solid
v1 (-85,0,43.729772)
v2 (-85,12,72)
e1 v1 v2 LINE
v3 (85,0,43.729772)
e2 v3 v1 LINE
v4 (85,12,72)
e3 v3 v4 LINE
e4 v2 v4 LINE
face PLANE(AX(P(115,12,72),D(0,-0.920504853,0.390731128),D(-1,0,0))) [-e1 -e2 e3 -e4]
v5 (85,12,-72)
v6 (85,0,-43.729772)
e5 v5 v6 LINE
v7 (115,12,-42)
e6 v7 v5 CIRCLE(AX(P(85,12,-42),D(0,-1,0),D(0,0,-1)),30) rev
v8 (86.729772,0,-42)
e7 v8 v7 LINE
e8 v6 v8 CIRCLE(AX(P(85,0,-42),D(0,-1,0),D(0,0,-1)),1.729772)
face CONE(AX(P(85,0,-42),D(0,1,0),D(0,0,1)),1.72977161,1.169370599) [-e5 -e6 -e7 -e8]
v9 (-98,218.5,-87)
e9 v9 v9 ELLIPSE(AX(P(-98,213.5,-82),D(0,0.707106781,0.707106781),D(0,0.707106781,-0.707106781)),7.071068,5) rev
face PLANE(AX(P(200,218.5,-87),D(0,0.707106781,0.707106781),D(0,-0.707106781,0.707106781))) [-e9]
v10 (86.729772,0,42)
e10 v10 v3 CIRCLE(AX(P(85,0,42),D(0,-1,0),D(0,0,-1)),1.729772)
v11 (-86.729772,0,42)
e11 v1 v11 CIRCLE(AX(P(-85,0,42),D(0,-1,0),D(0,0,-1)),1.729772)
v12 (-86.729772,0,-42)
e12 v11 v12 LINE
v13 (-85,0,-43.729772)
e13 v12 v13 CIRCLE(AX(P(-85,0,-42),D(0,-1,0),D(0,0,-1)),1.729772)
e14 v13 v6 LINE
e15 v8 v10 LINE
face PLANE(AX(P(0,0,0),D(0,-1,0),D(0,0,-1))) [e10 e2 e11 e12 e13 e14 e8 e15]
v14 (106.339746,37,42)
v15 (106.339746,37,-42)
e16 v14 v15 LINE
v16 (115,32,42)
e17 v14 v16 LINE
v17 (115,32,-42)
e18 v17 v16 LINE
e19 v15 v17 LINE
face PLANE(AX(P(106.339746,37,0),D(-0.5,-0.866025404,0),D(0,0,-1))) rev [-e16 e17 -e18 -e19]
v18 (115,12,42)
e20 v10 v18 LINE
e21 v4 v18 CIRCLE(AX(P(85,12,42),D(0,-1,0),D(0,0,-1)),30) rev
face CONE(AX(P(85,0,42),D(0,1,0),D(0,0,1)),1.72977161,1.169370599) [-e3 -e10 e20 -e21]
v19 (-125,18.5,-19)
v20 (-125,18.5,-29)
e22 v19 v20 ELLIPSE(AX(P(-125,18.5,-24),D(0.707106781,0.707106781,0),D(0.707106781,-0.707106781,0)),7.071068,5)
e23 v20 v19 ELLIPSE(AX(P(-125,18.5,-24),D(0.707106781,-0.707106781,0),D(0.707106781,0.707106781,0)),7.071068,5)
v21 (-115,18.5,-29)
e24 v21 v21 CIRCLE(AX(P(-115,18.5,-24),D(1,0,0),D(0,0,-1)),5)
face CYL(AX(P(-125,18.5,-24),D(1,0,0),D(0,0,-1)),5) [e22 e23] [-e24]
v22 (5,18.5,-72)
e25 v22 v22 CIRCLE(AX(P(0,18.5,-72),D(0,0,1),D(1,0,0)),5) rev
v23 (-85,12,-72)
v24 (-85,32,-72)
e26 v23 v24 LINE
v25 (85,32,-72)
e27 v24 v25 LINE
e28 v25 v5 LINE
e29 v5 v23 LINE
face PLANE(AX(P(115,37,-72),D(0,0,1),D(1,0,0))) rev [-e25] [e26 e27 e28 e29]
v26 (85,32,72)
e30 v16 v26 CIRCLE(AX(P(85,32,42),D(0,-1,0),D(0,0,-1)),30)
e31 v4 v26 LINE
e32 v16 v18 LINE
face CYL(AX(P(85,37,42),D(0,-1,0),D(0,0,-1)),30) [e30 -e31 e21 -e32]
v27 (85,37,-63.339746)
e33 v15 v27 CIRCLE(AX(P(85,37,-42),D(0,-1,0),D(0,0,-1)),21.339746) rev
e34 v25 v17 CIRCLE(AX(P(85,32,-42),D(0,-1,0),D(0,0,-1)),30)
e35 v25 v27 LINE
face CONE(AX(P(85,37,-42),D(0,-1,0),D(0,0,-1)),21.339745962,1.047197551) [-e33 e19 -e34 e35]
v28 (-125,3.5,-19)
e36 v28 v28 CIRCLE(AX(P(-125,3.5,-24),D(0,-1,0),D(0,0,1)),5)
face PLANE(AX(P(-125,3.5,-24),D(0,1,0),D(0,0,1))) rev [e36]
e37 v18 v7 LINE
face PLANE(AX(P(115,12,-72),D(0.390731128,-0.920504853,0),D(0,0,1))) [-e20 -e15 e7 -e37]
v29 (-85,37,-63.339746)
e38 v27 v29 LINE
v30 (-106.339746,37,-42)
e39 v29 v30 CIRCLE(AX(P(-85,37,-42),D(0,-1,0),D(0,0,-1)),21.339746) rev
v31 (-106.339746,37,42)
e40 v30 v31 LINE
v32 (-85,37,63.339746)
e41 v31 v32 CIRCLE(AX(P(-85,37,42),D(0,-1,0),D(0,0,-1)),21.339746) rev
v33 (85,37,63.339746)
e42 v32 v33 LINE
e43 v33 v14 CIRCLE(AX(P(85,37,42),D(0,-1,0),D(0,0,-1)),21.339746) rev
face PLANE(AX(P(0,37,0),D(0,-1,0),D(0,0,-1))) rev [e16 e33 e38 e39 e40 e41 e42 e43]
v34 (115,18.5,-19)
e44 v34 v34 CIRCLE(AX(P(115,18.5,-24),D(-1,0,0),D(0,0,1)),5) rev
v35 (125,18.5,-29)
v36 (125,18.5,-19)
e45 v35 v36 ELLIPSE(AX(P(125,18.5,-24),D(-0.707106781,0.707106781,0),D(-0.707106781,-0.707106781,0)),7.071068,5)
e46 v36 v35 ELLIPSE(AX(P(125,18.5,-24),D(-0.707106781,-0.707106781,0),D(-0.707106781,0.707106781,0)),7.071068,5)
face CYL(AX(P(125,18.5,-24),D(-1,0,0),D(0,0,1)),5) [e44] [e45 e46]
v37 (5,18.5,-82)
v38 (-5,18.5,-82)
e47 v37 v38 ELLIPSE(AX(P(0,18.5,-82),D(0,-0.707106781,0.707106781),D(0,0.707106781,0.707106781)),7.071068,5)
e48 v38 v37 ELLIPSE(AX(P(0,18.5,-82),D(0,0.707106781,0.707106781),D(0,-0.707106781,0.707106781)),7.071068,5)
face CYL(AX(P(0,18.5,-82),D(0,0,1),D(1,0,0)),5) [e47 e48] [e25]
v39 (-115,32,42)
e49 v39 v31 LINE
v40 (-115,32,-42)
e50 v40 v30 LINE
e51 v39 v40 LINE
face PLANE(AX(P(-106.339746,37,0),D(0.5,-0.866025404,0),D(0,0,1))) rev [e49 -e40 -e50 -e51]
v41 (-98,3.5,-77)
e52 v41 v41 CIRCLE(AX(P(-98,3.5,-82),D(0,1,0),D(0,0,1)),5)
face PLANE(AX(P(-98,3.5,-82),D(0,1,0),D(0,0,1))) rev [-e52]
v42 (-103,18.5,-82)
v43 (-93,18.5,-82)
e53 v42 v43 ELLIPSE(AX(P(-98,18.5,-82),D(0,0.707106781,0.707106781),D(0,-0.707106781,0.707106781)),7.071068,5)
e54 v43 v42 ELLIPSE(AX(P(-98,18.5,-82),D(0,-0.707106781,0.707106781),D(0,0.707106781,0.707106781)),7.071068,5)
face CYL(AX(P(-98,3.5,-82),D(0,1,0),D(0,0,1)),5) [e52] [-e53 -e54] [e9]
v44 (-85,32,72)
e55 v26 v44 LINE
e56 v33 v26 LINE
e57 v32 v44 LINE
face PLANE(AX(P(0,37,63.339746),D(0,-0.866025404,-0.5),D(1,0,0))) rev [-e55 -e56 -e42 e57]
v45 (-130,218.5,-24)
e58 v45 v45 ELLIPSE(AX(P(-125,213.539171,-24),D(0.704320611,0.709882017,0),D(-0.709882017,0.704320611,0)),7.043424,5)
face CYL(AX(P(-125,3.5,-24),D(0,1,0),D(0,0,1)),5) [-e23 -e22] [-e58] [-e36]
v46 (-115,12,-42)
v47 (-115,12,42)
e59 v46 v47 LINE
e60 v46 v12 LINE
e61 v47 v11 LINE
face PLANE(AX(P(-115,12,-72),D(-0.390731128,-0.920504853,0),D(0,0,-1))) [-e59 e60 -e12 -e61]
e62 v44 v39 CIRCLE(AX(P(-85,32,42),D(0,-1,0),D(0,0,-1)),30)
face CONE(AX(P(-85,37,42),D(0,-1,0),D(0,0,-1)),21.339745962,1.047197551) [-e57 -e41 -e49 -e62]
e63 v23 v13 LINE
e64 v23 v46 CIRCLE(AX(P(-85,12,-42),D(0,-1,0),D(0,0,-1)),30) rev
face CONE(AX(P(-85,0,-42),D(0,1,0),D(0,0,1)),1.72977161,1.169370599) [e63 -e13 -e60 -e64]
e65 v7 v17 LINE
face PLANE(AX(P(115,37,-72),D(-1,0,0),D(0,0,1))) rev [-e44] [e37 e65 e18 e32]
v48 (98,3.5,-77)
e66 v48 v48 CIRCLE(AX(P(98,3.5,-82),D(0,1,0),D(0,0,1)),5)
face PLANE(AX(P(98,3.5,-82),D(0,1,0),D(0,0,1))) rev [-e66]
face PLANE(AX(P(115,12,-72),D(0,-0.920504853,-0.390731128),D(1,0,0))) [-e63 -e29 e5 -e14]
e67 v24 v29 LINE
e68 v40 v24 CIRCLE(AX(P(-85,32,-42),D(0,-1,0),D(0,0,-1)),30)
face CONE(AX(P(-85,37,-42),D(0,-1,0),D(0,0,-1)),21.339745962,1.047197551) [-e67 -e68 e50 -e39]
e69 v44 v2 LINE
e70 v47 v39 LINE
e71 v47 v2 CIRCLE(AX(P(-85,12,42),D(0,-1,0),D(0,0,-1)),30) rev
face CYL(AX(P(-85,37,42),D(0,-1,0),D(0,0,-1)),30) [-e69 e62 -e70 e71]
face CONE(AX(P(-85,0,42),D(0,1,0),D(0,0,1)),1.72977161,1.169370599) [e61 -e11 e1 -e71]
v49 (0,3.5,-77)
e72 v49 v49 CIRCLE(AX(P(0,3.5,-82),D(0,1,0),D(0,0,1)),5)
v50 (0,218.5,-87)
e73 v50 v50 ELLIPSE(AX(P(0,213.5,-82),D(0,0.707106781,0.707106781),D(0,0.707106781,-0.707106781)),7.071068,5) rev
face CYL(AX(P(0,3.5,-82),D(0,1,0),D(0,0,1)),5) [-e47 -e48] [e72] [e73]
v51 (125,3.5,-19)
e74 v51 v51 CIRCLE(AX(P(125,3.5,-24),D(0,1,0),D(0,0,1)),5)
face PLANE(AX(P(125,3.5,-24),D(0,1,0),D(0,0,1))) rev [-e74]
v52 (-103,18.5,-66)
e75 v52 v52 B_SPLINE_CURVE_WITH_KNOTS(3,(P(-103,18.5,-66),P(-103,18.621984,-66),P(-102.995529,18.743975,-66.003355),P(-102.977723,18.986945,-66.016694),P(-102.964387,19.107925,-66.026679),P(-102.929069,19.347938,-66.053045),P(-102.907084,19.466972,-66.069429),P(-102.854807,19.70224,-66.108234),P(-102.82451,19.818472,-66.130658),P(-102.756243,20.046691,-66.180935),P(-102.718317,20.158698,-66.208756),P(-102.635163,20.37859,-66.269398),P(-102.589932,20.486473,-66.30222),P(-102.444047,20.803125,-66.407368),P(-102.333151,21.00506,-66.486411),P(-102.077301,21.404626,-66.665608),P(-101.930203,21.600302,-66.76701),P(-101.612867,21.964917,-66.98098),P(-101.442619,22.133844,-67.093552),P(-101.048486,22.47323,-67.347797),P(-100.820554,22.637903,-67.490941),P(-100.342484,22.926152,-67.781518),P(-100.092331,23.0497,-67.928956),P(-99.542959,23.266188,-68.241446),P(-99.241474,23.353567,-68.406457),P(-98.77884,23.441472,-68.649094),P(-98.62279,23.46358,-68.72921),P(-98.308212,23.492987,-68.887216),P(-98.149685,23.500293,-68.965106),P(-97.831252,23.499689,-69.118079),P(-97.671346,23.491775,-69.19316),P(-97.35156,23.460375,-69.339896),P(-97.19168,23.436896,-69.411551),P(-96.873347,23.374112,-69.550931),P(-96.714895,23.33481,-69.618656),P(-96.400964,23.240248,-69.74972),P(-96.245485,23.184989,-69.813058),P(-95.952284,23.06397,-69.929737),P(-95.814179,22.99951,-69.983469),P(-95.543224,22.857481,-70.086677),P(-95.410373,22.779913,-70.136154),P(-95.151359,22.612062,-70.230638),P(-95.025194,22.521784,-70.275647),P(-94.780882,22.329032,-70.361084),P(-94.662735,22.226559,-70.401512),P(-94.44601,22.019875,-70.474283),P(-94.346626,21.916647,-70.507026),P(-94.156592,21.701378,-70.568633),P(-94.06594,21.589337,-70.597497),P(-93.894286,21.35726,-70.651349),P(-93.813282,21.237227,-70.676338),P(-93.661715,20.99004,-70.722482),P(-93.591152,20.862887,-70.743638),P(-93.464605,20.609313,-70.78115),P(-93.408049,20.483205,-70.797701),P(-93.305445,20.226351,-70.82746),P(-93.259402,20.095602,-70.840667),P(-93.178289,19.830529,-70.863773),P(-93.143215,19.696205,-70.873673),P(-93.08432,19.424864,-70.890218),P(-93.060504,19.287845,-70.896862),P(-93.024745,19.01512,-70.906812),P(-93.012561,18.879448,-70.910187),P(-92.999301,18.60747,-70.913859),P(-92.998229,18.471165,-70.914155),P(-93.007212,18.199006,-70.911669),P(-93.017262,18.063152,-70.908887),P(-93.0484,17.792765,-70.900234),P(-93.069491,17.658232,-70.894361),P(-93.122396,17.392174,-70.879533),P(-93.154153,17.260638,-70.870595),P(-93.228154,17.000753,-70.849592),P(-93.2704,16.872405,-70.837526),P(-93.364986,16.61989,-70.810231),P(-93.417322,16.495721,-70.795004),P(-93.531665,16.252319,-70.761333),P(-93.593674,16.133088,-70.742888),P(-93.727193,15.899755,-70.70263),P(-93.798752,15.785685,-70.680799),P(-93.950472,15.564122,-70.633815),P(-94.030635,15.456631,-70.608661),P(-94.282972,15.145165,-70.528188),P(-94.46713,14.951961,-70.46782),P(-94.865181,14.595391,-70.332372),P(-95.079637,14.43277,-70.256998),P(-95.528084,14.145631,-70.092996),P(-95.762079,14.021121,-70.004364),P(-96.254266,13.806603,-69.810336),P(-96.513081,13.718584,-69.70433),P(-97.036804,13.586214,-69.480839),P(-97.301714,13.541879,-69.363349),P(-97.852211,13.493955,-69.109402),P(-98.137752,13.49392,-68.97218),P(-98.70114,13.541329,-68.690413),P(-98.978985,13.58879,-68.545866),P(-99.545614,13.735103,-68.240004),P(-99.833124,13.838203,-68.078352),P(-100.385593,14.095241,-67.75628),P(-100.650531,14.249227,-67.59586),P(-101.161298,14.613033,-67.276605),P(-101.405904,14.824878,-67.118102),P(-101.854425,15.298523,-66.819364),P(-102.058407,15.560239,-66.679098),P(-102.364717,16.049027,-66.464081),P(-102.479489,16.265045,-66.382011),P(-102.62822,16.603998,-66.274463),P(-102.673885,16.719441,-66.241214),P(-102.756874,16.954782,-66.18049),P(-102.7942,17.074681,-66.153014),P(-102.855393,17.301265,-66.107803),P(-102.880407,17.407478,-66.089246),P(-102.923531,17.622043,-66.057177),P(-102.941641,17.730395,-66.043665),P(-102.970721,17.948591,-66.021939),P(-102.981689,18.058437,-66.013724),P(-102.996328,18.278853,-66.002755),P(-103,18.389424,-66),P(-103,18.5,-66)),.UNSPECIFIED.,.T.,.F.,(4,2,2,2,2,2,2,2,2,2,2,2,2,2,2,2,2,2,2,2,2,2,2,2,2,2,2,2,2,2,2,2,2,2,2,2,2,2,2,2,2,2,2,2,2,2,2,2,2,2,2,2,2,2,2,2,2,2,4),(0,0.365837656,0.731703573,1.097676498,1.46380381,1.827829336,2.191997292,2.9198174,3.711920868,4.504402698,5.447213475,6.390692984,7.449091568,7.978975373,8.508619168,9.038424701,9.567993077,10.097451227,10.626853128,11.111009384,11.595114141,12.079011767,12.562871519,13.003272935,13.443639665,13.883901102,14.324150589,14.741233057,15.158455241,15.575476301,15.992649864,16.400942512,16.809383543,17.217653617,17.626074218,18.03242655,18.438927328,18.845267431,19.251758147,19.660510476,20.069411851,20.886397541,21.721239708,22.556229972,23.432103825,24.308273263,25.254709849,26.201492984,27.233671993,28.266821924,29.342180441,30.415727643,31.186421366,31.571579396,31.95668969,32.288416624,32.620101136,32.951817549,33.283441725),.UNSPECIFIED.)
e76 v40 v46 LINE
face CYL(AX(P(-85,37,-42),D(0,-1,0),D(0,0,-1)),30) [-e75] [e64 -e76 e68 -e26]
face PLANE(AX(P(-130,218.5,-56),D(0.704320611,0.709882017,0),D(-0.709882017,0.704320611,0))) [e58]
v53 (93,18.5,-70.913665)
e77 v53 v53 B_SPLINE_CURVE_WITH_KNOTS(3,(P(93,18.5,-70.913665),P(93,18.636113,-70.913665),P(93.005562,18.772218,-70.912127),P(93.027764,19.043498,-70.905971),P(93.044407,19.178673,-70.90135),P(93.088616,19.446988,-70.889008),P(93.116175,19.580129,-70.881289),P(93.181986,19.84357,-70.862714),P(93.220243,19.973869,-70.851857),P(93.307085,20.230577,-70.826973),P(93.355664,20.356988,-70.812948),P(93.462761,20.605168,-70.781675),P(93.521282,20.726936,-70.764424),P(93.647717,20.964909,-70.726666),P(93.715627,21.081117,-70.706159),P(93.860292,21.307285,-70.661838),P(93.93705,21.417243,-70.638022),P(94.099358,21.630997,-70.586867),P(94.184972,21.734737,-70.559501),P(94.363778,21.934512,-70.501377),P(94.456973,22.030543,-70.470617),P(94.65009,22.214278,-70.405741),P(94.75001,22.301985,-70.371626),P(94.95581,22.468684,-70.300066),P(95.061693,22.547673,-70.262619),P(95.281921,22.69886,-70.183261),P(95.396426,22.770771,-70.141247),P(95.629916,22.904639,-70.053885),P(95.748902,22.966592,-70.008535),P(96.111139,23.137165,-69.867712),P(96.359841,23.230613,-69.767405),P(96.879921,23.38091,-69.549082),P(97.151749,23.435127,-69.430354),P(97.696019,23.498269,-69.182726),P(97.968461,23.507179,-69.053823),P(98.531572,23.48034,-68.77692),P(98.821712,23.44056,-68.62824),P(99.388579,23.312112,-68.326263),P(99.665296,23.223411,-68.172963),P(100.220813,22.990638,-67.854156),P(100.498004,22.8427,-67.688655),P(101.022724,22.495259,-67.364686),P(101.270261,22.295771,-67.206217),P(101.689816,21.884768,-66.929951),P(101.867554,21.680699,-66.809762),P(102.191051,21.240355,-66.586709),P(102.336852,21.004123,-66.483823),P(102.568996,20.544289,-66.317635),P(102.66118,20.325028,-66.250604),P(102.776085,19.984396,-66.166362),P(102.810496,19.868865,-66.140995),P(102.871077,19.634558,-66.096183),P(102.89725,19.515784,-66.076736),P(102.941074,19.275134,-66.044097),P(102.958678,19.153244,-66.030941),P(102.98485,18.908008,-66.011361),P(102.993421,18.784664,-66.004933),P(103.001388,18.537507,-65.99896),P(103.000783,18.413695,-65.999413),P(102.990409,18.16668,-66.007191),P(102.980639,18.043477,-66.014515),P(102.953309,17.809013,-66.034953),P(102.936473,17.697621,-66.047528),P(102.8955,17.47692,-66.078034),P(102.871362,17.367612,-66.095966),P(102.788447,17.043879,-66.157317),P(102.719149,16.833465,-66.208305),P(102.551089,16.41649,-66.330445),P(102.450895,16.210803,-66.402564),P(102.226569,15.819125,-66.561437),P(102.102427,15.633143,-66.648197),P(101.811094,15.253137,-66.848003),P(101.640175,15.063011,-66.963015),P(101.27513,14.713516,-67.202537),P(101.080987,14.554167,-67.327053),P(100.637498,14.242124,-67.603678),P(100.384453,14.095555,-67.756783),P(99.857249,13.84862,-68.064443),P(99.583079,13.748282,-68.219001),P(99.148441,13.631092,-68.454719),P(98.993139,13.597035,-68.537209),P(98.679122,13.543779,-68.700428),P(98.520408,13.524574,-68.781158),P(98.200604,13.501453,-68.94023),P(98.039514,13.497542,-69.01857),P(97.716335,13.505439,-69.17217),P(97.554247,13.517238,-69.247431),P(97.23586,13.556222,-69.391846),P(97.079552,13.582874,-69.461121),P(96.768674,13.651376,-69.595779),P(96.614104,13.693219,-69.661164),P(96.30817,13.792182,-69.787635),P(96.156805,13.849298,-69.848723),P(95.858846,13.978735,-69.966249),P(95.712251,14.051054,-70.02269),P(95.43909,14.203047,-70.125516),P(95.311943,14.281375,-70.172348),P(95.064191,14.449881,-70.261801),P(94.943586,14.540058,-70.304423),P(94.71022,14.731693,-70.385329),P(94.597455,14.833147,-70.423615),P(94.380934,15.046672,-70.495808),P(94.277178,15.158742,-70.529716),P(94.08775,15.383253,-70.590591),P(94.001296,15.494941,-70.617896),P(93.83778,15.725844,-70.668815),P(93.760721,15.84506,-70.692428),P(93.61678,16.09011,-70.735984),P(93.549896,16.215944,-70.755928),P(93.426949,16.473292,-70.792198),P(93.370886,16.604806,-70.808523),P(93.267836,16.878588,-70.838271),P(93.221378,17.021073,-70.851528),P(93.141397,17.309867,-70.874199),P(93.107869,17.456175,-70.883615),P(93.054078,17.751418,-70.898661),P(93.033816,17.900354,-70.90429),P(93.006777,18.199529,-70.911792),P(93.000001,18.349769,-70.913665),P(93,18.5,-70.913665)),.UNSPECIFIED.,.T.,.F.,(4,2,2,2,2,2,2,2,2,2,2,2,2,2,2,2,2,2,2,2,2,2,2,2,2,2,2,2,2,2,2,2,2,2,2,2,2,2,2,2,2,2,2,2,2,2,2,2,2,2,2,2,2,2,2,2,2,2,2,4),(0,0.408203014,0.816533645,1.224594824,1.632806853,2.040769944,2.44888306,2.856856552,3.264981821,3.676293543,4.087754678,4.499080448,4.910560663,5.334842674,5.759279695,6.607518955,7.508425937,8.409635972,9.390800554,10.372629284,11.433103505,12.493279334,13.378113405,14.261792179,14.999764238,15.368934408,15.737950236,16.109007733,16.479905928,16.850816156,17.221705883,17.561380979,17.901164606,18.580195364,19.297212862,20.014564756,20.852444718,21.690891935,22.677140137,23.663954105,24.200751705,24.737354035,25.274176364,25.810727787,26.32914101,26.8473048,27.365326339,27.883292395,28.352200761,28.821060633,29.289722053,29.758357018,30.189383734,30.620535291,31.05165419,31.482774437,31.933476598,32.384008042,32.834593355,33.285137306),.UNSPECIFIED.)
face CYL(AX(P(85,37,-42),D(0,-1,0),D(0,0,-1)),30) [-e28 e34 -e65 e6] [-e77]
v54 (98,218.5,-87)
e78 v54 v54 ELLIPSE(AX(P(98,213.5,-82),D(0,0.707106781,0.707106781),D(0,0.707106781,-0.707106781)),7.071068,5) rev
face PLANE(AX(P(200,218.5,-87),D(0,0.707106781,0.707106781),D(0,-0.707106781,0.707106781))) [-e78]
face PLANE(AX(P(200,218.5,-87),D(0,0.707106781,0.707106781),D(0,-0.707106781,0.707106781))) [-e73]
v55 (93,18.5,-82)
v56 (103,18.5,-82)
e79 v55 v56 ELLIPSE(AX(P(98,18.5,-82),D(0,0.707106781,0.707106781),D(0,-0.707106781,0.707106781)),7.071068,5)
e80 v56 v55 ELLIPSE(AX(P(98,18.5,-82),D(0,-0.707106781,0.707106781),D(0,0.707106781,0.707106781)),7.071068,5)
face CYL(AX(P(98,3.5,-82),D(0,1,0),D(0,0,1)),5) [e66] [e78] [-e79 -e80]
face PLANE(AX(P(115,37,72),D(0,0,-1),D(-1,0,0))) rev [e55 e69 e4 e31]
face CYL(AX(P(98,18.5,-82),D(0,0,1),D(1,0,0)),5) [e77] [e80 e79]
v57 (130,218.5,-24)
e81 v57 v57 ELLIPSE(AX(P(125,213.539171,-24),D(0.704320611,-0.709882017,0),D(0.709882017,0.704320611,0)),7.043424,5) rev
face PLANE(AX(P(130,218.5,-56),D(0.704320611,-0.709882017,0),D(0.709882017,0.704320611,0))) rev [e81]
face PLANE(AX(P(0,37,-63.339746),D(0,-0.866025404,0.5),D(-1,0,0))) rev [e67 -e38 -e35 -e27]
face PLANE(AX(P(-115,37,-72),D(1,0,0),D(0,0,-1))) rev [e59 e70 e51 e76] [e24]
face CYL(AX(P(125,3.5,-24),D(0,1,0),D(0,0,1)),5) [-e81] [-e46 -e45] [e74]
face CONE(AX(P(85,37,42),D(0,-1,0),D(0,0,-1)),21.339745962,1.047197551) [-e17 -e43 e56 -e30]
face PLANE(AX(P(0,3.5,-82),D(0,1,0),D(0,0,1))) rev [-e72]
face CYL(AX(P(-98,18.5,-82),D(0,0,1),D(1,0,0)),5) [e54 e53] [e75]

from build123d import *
from OCP.BRepFilletAPI import BRepFilletAPI_MakeChamfer

# Parameters (mm, degrees)
ESBO_O1_W                     = 230
ESBO_O1_H                     = 144
RESSALTO_EXTRUS_O1_DEPTH      = 37
ESBO_O2_R                     = 5
RESSALTO_EXTRUS_O2_DEPTH      = 10
RESSALTO_EXTRUS_O3_START      = -15
ESBO_O3_R                     = 5
RESSALTO_EXTRUS_O3_DEPTH      = 215
CORTE_EXTRUS_O1_DEPTH         = 56
ESBO_O6_R                     = 5
RESSALTO_EXTRUS_O4_DEPTH      = 10
RESSALTO_EXTRUS_O5_DEPTH      = 200
RESSALTO_EXTRUS_O5_DEPTH_BACK = 15
ESBO_O7_R                     = 5
CORTE_EXTRUS_O2_DEPTH         = 200
CORTE_EXTRUS_O2_DEPTH_BACK    = 200
FILETE1_START                 = -1
FILETE1_DEPTH                 = 39
FILETE1_START_2               = 23.5000001
FILETE1_2_DEPTH               = 14.4999999
FILETE1_3_DEPTH               = 14.499999761
FILETE1_START_3               = 23.281176651
FILETE1_4_DEPTH               = 9.810883349
FILETE1_START_4               = 13.499999761
FILETE1_5_DEPTH               = 9.78117689
FILETE1_6_DEPTH               = 0.218823449
FILETE1_START_5               = -72
FILETE1_7_OUTLINE_R           = 5
FILETE1_7_DEPTH               = 30
CHANFRO1_SIZE                 = 5
CHANFRO1_SIZE2                = 8.660254038
CHANFRO2_SIZE                 = 12
CHANFRO2_SIZE2                = 28.27022839


with BuildPart() as part:
    # Esboço1 → Ressalto-extrusão1 (new body)
    with BuildSketch(Plane(origin=(0, 0, 0), x_dir=(1, 0, 0), z_dir=(0, 1, 0))):
        Rectangle(ESBO_O1_W, ESBO_O1_H)
    extrude(amount=RESSALTO_EXTRUS_O1_DEPTH)

    # Esboço2 → Ressalto-extrusão2 (add)
    with BuildSketch(Plane(origin=(115, 0, 0), x_dir=(0, 0, -1), z_dir=(1, 0, 0))):
        with Locations(Location((24, 18.5, 0), (0, 0, 180))):
            Circle(ESBO_O2_R)
    ressalto_extrus_o2 = extrude(amount=RESSALTO_EXTRUS_O2_DEPTH)

    # Esboço3 → Ressalto-extrusão3 (add)
    with BuildSketch(Plane(origin=(0, 18.5, 0), x_dir=(1, 0, 0), z_dir=(0, 1, 0)).offset(RESSALTO_EXTRUS_O3_START)):
        with Locations(Location((125, 24, 0), (0, 0, 270))):
            Circle(ESBO_O3_R)
    ressalto_extrus_o3 = extrude(amount=RESSALTO_EXTRUS_O3_DEPTH)

    # Esboço4 → Corte-extrusão1 (cut)
    with BuildSketch(Plane.XY):
        Polygon((130, 218.5), (120, 208.57834268), (120, 218.5), align=None)
    corte_extrus_o1 = extrude(amount=-CORTE_EXTRUS_O1_DEPTH, mode=Mode.SUBTRACT)

    # Espelhar1: Ressalto-extrusão2, Ressalto-extrusão3, Corte-extrusão1 across plane
    add(ressalto_extrus_o2.mirror(Plane(origin=(0, 0, 0), x_dir=(0, 0, 1), z_dir=(1, 0, 0))))
    add(ressalto_extrus_o3.mirror(Plane(origin=(0, 0, 0), x_dir=(0, 0, 1), z_dir=(1, 0, 0))))
    add(corte_extrus_o1.mirror(Plane(origin=(0, 0, 0), x_dir=(0, 0, 1), z_dir=(1, 0, 0))), mode=Mode.SUBTRACT)

    # Esboço6 → Ressalto-extrusão4 (add)
    with BuildSketch(Plane(origin=(0, 0, -72), x_dir=(-1, 0, 0), z_dir=(0, 0, -1))):
        with Locations(Location((-98, 18.5, 0), (0, 0, 180))):
            Circle(ESBO_O6_R)
        with Locations(Location((0, 18.5, 0), (0, 0, 180))):
            Circle(ESBO_O6_R)
        with Locations(Location((98, 18.5, 0), (0, 0, 180))):
            Circle(ESBO_O6_R)
    extrude(amount=RESSALTO_EXTRUS_O4_DEPTH)

    # Esboço7 → Ressalto-extrusão5 (add, two sides: drawn at the far end of the back side and taken through both)
    with BuildSketch(Plane(origin=(0, 18.5, 0), x_dir=(1, 0, 0), z_dir=(0, 1, 0)).offset(-RESSALTO_EXTRUS_O5_DEPTH_BACK)):
        with Locations(Location((-98, 82, 0), (0, 0, 270))):
            Circle(ESBO_O7_R)
        with Locations(Location((0, 82, 0), (0, 0, 270))):
            Circle(ESBO_O7_R)
        with Locations(Location((98, 82, 0), (0, 0, 270))):
            Circle(ESBO_O7_R)
    extrude(amount=RESSALTO_EXTRUS_O5_DEPTH + RESSALTO_EXTRUS_O5_DEPTH_BACK)

    # Esboço8 → Corte-extrusão2 (cut, two sides: drawn at the far end of the back side and taken through both)
    with BuildSketch(Plane(origin=(0, 0, 0), x_dir=(0, 0, -1), z_dir=(1, 0, 0)).offset(-CORTE_EXTRUS_O2_DEPTH_BACK)):
        Polygon((87, 218.5), (77, 208.5), (77, 218.5), align=None)
    extrude(amount=CORTE_EXTRUS_O2_DEPTH + CORTE_EXTRUS_O2_DEPTH_BACK, mode=Mode.SUBTRACT)

    # Filete1: read off the stored shape, not the designer's step
    # Filete1 outline → Filete1 (cut)
    with BuildSketch(Plane(origin=(0, 0, 0), x_dir=(1, 0, 0), z_dir=(0, 1, 0)).offset(FILETE1_START)):
        with BuildLine():
            ThreePointArc((-85, -72), (-106.213203436, -63.213203436), (-115, -42))
            Line((-115, -42), (-115, -72))
            Line((-115, -72), (-85, -72))
        make_face()
        with BuildLine():
            ThreePointArc((115, -42), (106.213203436, -63.213203436), (85, -72))
            Line((85, -72), (115, -72))
            Line((115, -72), (115, -42))
        make_face()
    extrude(amount=FILETE1_DEPTH, mode=Mode.SUBTRACT)

    # Filete1 2 outline → Filete1 2 (cut)
    with BuildSketch(Plane(origin=(0, 0, 0), x_dir=(1, 0, 0), z_dir=(0, 1, 0)).offset(FILETE1_START_2)):
        with BuildLine():
            Line((-115, 72), (-115, 42))
            ThreePointArc((-115, 42), (-106.213203436, 63.213203436), (-85, 72))
            Line((-85, 72), (-115, 72))
        make_face()
        with BuildLine():
            Line((115, 72), (85, 72))
            ThreePointArc((85, 72), (106.213203436, 63.213203436), (115, 42))
            Line((115, 42), (115, 72))
        make_face()
    extrude(amount=FILETE1_2_DEPTH, mode=Mode.SUBTRACT)

    # Filete1 3 outline → Filete1 3 (cut)
    with BuildSketch(Plane(origin=(0, 0, 0), x_dir=(1, 0, 0), z_dir=(0, 1, 0)).offset(FILETE1_START)):
        with BuildLine():
            Line((-115, 72), (-115, 42))
            ThreePointArc((-115, 42), (-106.213203436, 63.213203436), (-85, 72))
            Line((-85, 72), (-115, 72))
        make_face()
        with BuildLine():
            Line((115, 72), (85, 72))
            ThreePointArc((85, 72), (106.213203436, 63.213203436), (115, 42))
            Line((115, 42), (115, 72))
        make_face()
    extrude(amount=FILETE1_3_DEPTH, mode=Mode.SUBTRACT)

    # Filete1 4 outline → Filete1 4 (cut)
    with BuildSketch(Plane(origin=(0, 0, 0), x_dir=(1, 0, 0), z_dir=(0, 1, 0)).offset(FILETE1_START_3)):
        with BuildLine():
            Line((115, 72), (85, 72))
            ThreePointArc((85, 72), (106.213203436, 63.213203436), (115, 42))
            Line((115, 42), (115, 72))
        make_face()
    extrude(amount=FILETE1_4_DEPTH, mode=Mode.SUBTRACT)

    # Filete1 5 outline → Filete1 5 (cut)
    with BuildSketch(Plane(origin=(0, 0, 0), x_dir=(1, 0, 0), z_dir=(0, 1, 0)).offset(FILETE1_START_4)):
        with BuildLine():
            Line((-115, 72), (-115, 42))
            ThreePointArc((-115, 42), (-106.213203436, 63.213203436), (-85, 72))
            Line((-85, 72), (-115, 72))
        make_face()
        with BuildLine():
            Line((115, 72), (85, 72))
            ThreePointArc((85, 72), (106.213203436, 63.213203436), (115, 42))
            Line((115, 42), (115, 72))
        make_face()
    extrude(amount=FILETE1_5_DEPTH, mode=Mode.SUBTRACT)

    # Filete1 6 outline → Filete1 6 (cut)
    with BuildSketch(Plane(origin=(0, 0, 0), x_dir=(1, 0, 0), z_dir=(0, 1, 0)).offset(FILETE1_START_3)):
        with BuildLine():
            Line((-115, 72), (-115, 42))
            ThreePointArc((-115, 42), (-106.213203436, 63.213203436), (-85, 72))
            Line((-85, 72), (-115, 72))
        make_face()
    extrude(amount=FILETE1_6_DEPTH, mode=Mode.SUBTRACT)

    # Filete1 7 outline → Filete1 7 (add)
    with BuildSketch(Plane.XY.offset(FILETE1_START_5)):
        with Locations((98, 18.5)):
            Circle(FILETE1_7_OUTLINE_R)
        with Locations((-98, 18.5)):
            Circle(FILETE1_7_OUTLINE_R)
    extrude(amount=FILETE1_7_DEPTH)

    # Chanfro1: one chamfer whose edges measure the first distance from different faces: ONE call of the kernel's chamfer builder (chamfer() names one face for all edges)
    chanfro1_edges_1 = [part.edges().sort_by_distance(p)[0] for p in [
        (-115, 37, 0),
    ]]
    chanfro1_side_1 = [part.faces().sort_by_distance(p)[0] for p in [
        (-115, 18.5, 0.622208406),
    ]]
    chanfro1_edges_2 = [part.edges().sort_by_distance(p)[0] for p in [
        (0, 37, -72),
    ]]
    chanfro1_side_2 = [part.faces().sort_by_distance(p)[0] for p in [
        (0, 1.739798839, -72),
    ]]
    chanfro1_edges_3 = [part.edges().sort_by_distance(p)[0] for p in [
        (0, 37, 72),
    ]]
    chanfro1_side_3 = [part.faces().sort_by_distance(p)[0] for p in [
        (0, 18.5, 72),
    ]]
    chanfro1_edges_4 = [part.edges().sort_by_distance(p)[0] for p in [
        (115, 37, 0),
    ]]
    chanfro1_side_4 = [part.faces().sort_by_distance(p)[0] for p in [
        (115, 18.5, 0.622208406),
    ]]
    chanfro1_edges_5 = [part.edges().sort_by_distance(p)[0] for p in [
        (-106.213203436, 37, 63.213203436),
    ]]
    chanfro1_side_5 = [part.faces().sort_by_distance(p)[0] for p in [
        (-106.213203436, 18.5, 63.213203436),
    ]]
    chanfro1_edges_6 = [part.edges().sort_by_distance(p)[0] for p in [
        (106.213203436, 37, 63.213203436),
    ]]
    chanfro1_side_6 = [part.faces().sort_by_distance(p)[0] for p in [
        (106.213203436, 18.5, 63.213203436),
    ]]
    chanfro1_edges_7 = [part.edges().sort_by_distance(p)[0] for p in [
        (106.213203436, 37, -63.213203436),
    ]]
    chanfro1_side_7 = [part.faces().sort_by_distance(p)[0] for p in [
        (106.213203436, 18.5, -63.213203436),
    ]]
    chanfro1_edges_8 = [part.edges().sort_by_distance(p)[0] for p in [
        (-106.213203436, 37, -63.213203436),
    ]]
    chanfro1_side_8 = [part.faces().sort_by_distance(p)[0] for p in [
        (-106.213203436, 18.5, -63.213203436),
    ]]
    chanfro1 = BRepFilletAPI_MakeChamfer(part.part.solid().wrapped)
    for e in chanfro1_edges_1:
        chanfro1.Add(CHANFRO1_SIZE, CHANFRO1_SIZE2, e.wrapped, chanfro1_side_1[0].wrapped)  # the first distance lies on this face
    for e in chanfro1_edges_2:
        chanfro1.Add(CHANFRO1_SIZE, CHANFRO1_SIZE2, e.wrapped, chanfro1_side_2[0].wrapped)  # the first distance lies on this face
    for e in chanfro1_edges_3:
        chanfro1.Add(CHANFRO1_SIZE, CHANFRO1_SIZE2, e.wrapped, chanfro1_side_3[0].wrapped)  # the first distance lies on this face
    for e in chanfro1_edges_4:
        chanfro1.Add(CHANFRO1_SIZE, CHANFRO1_SIZE2, e.wrapped, chanfro1_side_4[0].wrapped)  # the first distance lies on this face
    for e in chanfro1_edges_5:
        chanfro1.Add(CHANFRO1_SIZE, CHANFRO1_SIZE2, e.wrapped, chanfro1_side_5[0].wrapped)  # the first distance lies on this face
    for e in chanfro1_edges_6:
        chanfro1.Add(CHANFRO1_SIZE, CHANFRO1_SIZE2, e.wrapped, chanfro1_side_6[0].wrapped)  # the first distance lies on this face
    for e in chanfro1_edges_7:
        chanfro1.Add(CHANFRO1_SIZE, CHANFRO1_SIZE2, e.wrapped, chanfro1_side_7[0].wrapped)  # the first distance lies on this face
    for e in chanfro1_edges_8:
        chanfro1.Add(CHANFRO1_SIZE, CHANFRO1_SIZE2, e.wrapped, chanfro1_side_8[0].wrapped)  # the first distance lies on this face
    add(Compound.cast(chanfro1.Shape()), mode=Mode.REPLACE)

    # Chanfro2: one chamfer whose edges measure the first distance from different faces: ONE call of the kernel's chamfer builder (chamfer() names one face for all edges)
    chanfro2_edges_1 = [part.edges().sort_by_distance(p)[0] for p in [
        (-115, 0, 0),
    ]]
    chanfro2_side_1 = [part.faces().sort_by_distance(p)[0] for p in [
        (-115, 15.924754728, 0.72235461),
    ]]
    chanfro2_edges_2 = [part.edges().sort_by_distance(p)[0] for p in [
        (0, 0, -72),
    ]]
    chanfro2_side_2 = [part.faces().sort_by_distance(p)[0] for p in [
        (83.270144515, 16, -72),
    ]]
    chanfro2_edges_3 = [part.edges().sort_by_distance(p)[0] for p in [
        (115, 0, 0),
    ]]
    chanfro2_side_3 = [part.faces().sort_by_distance(p)[0] for p in [
        (115, 15.924754728, 0.72235461),
    ]]
    chanfro2_edges_4 = [part.edges().sort_by_distance(p)[0] for p in [
        (0, 0, 72),
    ]]
    chanfro2_side_4 = [part.faces().sort_by_distance(p)[0] for p in [
        (0, 16, 72),
    ]]
    chanfro2_edges_5 = [part.edges().sort_by_distance(p)[0] for p in [
        (-106.213203436, 0, 63.213203436),
    ]]
    chanfro2_side_5 = [part.faces().sort_by_distance(p)[0] for p in [
        (-106.213203436, 16, 63.213203436),
    ]]
    chanfro2_edges_6 = [part.edges().sort_by_distance(p)[0] for p in [
        (106.213203436, 0, 63.213203436),
    ]]
    chanfro2_side_6 = [part.faces().sort_by_distance(p)[0] for p in [
        (106.213203436, 16, 63.213203436),
    ]]
    chanfro2_edges_7 = [part.edges().sort_by_distance(p)[0] for p in [
        (106.213203436, 0, -63.213203436),
    ]]
    chanfro2_side_7 = [part.faces().sort_by_distance(p)[0] for p in [
        (106.213203436, 16, -63.213203436),
    ]]
    chanfro2_edges_8 = [part.edges().sort_by_distance(p)[0] for p in [
        (-106.213203436, 0, -63.213203436),
    ]]
    chanfro2_side_8 = [part.faces().sort_by_distance(p)[0] for p in [
        (-106.213203436, 16, -63.213203436),
    ]]
    chanfro2 = BRepFilletAPI_MakeChamfer(part.part.solid().wrapped)
    for e in chanfro2_edges_1:
        chanfro2.Add(CHANFRO2_SIZE, CHANFRO2_SIZE2, e.wrapped, chanfro2_side_1[0].wrapped)  # the first distance lies on this face
    for e in chanfro2_edges_2:
        chanfro2.Add(CHANFRO2_SIZE, CHANFRO2_SIZE2, e.wrapped, chanfro2_side_2[0].wrapped)  # the first distance lies on this face
    for e in chanfro2_edges_3:
        chanfro2.Add(CHANFRO2_SIZE, CHANFRO2_SIZE2, e.wrapped, chanfro2_side_3[0].wrapped)  # the first distance lies on this face
    for e in chanfro2_edges_4:
        chanfro2.Add(CHANFRO2_SIZE, CHANFRO2_SIZE2, e.wrapped, chanfro2_side_4[0].wrapped)  # the first distance lies on this face
    for e in chanfro2_edges_5:
        chanfro2.Add(CHANFRO2_SIZE, CHANFRO2_SIZE2, e.wrapped, chanfro2_side_5[0].wrapped)  # the first distance lies on this face
    for e in chanfro2_edges_6:
        chanfro2.Add(CHANFRO2_SIZE, CHANFRO2_SIZE2, e.wrapped, chanfro2_side_6[0].wrapped)  # the first distance lies on this face
    for e in chanfro2_edges_7:
        chanfro2.Add(CHANFRO2_SIZE, CHANFRO2_SIZE2, e.wrapped, chanfro2_side_7[0].wrapped)  # the first distance lies on this face
    for e in chanfro2_edges_8:
        chanfro2.Add(CHANFRO2_SIZE, CHANFRO2_SIZE2, e.wrapped, chanfro2_side_8[0].wrapped)  # the first distance lies on this face
    add(Compound.cast(chanfro2.Shape()), mode=Mode.REPLACE)


solid = part.part
